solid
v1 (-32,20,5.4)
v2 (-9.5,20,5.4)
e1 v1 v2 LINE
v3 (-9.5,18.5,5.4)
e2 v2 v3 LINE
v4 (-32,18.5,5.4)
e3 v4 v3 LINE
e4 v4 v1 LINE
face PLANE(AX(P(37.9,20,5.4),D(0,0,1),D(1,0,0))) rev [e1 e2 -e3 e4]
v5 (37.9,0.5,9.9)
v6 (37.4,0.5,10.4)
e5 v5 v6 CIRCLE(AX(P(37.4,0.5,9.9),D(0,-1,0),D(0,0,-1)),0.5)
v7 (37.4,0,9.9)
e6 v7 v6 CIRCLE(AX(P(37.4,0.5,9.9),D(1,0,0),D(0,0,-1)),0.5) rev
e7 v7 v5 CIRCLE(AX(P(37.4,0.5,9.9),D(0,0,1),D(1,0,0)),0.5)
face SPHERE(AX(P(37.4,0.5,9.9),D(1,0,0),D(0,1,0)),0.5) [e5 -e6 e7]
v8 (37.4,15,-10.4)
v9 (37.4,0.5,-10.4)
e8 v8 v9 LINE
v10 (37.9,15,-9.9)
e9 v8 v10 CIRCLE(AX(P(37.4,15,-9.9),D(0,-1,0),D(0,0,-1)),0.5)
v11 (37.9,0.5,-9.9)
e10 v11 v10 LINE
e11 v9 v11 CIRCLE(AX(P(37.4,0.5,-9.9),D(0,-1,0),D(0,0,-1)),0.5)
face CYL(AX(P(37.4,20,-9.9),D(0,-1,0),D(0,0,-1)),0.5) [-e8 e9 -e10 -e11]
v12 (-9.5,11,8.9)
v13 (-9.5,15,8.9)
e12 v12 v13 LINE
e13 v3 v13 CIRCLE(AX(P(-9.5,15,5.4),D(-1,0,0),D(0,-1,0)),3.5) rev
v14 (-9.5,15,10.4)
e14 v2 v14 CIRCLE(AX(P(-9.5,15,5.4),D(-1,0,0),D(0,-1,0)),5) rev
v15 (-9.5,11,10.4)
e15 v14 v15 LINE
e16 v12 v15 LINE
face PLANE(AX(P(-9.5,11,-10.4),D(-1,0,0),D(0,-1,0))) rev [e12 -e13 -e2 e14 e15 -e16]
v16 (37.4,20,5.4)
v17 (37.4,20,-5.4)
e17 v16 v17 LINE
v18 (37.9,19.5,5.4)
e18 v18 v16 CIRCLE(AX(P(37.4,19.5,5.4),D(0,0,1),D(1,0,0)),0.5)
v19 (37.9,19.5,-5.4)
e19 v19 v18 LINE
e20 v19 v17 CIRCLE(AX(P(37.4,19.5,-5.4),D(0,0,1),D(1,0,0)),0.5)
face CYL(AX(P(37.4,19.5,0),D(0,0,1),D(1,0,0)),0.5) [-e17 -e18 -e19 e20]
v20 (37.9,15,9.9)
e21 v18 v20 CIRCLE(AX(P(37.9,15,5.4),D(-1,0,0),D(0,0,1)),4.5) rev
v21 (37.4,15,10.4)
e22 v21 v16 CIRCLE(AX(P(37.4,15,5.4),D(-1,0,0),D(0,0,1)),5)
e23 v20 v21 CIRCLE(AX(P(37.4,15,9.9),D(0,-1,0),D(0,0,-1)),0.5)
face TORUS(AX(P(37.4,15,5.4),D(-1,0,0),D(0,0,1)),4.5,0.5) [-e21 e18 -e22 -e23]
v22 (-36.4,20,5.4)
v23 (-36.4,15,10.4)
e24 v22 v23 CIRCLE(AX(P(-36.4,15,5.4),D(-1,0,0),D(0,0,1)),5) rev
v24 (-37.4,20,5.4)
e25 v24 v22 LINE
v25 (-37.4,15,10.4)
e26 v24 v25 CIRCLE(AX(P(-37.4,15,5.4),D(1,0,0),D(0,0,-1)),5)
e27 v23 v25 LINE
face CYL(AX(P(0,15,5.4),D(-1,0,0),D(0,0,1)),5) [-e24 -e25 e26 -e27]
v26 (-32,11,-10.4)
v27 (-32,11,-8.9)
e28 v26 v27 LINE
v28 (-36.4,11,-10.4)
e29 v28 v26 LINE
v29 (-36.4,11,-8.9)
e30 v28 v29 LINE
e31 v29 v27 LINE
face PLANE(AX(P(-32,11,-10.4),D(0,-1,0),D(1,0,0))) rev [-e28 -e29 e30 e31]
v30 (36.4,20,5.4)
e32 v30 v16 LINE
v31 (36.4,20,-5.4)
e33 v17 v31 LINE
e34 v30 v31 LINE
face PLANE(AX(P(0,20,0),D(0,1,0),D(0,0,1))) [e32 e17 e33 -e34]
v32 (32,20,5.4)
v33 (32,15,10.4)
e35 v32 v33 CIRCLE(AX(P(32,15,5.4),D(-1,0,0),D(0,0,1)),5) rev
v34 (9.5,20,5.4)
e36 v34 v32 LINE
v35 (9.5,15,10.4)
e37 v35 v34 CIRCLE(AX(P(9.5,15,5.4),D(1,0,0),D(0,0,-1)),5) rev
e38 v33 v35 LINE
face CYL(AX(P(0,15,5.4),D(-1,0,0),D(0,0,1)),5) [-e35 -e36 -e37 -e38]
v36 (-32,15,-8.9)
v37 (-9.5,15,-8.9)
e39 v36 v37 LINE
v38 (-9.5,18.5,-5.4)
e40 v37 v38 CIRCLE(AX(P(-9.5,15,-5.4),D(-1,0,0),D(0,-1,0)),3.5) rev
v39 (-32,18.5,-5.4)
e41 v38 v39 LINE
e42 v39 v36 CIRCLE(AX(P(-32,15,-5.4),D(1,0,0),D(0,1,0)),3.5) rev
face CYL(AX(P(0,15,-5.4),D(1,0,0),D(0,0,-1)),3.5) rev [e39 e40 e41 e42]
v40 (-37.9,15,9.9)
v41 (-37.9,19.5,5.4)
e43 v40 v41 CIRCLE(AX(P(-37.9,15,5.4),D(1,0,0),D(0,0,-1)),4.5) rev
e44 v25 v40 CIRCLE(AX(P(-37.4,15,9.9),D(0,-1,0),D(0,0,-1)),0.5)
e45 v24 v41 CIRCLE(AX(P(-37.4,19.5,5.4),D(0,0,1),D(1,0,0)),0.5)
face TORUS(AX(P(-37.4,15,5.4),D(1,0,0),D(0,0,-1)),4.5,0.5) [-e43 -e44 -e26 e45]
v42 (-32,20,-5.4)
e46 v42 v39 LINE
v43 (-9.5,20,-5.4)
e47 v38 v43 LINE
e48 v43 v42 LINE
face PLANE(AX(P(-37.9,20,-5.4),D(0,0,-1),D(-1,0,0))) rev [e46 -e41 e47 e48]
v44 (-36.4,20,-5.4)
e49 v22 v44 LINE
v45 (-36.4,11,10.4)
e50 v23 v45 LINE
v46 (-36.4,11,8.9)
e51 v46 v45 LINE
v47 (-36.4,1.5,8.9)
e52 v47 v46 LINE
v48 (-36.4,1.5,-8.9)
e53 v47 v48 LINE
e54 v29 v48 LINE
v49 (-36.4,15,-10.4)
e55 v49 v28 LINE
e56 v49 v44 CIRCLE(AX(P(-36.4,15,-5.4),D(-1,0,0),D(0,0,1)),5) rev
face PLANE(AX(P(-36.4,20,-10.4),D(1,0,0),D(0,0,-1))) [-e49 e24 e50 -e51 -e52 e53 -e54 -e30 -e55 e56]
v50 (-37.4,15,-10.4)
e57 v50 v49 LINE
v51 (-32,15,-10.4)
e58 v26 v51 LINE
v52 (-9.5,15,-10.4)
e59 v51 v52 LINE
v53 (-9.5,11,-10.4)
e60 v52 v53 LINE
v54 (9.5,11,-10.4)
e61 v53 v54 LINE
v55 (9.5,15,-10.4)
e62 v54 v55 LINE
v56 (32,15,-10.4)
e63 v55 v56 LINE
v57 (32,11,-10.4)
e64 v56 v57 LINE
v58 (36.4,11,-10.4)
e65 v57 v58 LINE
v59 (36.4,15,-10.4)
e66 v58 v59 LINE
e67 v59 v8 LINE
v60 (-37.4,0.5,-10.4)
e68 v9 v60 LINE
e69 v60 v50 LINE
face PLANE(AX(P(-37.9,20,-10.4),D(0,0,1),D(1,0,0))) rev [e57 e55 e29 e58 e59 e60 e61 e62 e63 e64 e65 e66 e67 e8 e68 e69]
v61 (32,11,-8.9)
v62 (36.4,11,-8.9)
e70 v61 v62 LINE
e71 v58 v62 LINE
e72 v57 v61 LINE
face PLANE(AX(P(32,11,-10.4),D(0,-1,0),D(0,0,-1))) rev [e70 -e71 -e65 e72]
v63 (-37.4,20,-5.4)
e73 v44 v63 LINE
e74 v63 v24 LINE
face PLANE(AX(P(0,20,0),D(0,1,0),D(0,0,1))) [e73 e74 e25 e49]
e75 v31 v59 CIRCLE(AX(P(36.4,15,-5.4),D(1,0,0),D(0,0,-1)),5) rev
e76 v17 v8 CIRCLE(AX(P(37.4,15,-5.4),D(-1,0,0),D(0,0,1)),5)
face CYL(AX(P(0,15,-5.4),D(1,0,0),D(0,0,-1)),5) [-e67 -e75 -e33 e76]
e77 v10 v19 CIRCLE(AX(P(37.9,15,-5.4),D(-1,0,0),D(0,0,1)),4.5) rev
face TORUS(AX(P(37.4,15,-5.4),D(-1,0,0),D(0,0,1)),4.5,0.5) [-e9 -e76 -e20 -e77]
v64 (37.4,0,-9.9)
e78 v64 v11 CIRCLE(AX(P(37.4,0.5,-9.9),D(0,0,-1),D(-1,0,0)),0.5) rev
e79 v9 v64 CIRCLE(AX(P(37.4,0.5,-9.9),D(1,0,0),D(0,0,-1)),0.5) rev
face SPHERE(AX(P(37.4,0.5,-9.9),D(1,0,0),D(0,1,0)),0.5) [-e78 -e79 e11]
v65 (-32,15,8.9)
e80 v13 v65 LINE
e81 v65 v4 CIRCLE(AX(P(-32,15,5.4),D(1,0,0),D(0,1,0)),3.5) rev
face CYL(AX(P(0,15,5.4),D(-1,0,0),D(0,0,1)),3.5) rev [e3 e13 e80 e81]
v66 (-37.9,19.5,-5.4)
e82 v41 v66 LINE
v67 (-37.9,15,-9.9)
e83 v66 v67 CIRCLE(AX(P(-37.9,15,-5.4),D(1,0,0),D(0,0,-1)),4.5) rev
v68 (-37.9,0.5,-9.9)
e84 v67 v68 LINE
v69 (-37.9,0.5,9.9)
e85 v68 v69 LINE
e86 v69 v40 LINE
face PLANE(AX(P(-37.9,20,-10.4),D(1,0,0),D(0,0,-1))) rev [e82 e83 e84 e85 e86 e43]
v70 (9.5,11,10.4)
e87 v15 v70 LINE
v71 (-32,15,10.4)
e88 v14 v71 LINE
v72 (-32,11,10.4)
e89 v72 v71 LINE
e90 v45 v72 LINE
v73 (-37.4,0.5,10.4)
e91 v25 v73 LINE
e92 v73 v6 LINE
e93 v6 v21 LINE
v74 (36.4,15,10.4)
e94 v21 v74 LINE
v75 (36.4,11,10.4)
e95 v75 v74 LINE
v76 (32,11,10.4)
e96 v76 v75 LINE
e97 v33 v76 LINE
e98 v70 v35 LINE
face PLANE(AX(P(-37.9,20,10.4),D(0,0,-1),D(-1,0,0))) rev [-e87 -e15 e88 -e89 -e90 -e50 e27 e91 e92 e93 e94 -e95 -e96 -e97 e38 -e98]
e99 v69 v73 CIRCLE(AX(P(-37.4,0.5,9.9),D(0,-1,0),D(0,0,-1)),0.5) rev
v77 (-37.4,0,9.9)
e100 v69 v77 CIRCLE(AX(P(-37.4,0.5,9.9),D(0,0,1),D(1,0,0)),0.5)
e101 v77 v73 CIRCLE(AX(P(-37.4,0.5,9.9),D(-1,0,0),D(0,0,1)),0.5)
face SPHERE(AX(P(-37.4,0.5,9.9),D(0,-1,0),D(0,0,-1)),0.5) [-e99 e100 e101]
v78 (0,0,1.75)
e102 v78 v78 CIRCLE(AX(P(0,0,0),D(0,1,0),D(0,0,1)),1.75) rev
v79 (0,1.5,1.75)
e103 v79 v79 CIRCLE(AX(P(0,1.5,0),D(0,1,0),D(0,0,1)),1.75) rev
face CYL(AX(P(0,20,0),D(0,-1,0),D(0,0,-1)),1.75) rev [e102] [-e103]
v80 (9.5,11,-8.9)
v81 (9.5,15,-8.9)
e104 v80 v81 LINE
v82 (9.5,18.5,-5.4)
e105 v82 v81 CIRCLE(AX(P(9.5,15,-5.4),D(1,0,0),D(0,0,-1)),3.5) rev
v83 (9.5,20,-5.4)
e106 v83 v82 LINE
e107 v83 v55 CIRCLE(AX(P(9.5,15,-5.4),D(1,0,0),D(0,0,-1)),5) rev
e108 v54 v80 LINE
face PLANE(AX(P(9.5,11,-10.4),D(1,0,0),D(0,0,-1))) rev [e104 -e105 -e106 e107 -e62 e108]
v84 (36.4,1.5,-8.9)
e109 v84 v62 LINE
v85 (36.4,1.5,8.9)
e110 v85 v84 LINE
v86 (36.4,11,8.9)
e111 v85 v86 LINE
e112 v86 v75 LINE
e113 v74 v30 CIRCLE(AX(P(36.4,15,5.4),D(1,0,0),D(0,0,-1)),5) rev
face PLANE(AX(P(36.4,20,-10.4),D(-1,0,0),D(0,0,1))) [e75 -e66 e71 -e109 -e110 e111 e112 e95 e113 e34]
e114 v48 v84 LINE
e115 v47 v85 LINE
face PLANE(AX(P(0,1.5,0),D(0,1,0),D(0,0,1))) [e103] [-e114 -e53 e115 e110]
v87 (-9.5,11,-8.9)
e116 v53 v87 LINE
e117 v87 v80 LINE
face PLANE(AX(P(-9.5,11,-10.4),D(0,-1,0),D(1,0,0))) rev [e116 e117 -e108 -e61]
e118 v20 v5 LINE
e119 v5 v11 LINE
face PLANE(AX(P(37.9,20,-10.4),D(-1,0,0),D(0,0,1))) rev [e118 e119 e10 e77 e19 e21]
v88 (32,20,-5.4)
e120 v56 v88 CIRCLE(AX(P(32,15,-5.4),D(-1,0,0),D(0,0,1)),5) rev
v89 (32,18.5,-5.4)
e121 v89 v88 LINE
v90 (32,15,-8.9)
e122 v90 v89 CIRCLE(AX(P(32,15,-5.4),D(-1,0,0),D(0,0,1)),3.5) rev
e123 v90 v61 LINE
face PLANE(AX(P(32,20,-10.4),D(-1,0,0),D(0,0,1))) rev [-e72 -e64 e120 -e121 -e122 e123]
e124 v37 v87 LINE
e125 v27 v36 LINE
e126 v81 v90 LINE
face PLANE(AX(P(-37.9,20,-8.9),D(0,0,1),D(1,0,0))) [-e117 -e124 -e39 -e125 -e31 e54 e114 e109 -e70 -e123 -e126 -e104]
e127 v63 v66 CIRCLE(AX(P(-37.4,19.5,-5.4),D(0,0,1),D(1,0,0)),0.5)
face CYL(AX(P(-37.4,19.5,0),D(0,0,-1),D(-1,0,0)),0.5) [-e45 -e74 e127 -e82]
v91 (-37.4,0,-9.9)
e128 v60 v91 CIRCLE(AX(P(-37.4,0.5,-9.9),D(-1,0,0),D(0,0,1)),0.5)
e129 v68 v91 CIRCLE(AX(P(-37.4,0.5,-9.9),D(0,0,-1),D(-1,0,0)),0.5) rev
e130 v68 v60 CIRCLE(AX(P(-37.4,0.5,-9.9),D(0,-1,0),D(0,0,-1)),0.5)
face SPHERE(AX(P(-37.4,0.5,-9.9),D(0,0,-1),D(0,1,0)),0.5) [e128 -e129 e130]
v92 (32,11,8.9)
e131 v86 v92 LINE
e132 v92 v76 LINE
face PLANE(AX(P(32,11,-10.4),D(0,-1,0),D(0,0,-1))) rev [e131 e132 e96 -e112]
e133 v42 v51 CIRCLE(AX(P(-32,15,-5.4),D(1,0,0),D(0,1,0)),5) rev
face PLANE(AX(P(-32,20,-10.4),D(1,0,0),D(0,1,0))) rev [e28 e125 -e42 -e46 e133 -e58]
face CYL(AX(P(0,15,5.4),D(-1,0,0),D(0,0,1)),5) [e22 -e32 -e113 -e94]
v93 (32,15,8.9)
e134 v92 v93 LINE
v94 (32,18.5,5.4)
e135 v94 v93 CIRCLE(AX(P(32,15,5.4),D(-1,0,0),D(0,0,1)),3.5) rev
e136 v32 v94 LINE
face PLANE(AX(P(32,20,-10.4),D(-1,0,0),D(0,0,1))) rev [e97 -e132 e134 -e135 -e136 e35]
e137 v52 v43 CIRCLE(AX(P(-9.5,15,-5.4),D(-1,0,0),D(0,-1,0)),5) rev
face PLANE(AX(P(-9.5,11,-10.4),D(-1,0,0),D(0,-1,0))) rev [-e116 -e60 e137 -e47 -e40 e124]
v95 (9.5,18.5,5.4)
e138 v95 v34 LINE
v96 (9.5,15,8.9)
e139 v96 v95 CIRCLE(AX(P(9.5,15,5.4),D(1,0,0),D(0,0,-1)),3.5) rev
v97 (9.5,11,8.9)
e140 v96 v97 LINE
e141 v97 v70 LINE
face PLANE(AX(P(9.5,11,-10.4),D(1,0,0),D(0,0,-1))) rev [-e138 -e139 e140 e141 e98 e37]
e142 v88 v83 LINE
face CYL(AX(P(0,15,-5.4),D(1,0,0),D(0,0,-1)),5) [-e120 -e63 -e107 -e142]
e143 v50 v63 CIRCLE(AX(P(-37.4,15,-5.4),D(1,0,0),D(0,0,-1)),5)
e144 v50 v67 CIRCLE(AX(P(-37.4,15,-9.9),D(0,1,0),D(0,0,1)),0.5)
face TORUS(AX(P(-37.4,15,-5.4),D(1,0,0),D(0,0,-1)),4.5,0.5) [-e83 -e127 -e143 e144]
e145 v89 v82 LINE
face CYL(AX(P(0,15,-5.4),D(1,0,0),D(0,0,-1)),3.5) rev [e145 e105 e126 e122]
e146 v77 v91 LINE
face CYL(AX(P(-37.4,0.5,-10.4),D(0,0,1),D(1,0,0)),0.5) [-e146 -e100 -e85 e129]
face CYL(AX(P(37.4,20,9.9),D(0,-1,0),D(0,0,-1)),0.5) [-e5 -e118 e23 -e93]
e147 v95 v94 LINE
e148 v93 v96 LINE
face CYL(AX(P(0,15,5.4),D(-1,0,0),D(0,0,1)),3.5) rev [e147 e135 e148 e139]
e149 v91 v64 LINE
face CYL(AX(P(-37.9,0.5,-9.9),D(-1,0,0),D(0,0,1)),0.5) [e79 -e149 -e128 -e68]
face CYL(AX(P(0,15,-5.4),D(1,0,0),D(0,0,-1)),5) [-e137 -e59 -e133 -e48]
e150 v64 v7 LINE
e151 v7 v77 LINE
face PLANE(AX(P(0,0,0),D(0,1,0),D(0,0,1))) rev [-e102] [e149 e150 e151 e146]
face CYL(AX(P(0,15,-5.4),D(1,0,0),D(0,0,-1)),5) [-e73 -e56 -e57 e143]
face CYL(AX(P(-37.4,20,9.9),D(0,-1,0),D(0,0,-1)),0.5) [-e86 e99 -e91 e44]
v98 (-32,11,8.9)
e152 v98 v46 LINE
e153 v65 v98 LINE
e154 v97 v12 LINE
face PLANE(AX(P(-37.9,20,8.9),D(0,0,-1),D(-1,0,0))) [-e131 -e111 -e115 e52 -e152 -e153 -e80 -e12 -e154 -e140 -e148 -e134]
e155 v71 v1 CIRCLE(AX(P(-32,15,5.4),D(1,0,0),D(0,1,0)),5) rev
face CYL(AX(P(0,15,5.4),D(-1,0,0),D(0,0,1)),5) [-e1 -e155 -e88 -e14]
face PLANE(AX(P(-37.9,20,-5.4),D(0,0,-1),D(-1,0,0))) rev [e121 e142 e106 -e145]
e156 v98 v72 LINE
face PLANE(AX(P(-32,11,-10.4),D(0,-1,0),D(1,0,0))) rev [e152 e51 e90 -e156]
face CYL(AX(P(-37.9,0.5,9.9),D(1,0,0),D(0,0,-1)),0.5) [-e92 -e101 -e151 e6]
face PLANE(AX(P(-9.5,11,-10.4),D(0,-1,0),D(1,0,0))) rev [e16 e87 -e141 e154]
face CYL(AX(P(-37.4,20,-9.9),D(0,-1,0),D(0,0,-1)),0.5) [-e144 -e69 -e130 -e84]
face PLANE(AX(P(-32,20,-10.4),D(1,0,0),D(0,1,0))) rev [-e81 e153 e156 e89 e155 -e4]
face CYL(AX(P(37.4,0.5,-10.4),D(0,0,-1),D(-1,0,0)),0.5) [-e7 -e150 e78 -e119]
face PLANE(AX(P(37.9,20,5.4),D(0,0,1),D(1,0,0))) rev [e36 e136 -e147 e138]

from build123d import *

# Parameters (mm, degrees)
CROQUIS1_W                        = 75.8
CROQUIS1_H                        = 20.8
SALIENTE_EXTRUIR1_DEPTH           = 20
REDONDEO1_R                       = 5
REDONDEO2_R                       = 0.5
VACIADO1_START                    = -36.4
VACIADO1_DEPTH                    = 72.8
CORTAR_EXTRUIR1_DEPTH             = 45.097278828
CORTAR_EXTRUIR1_DEPTH_BACK        = 45.097278828
CORTAR_EXTRUIR2_REACH             = 45.438
CROQUIS3_R                        = 1.75
CORTAR_EXTRUIR2_DIRECTION_2_DEPTH = 44.437541367


# Read off the part's stored shape, not the designer's step: Vaciado1
with BuildPart() as part:
    # Croquis1 → Saliente-Extruir1 (new body)
    with BuildSketch(Plane(origin=(0, 0, 0), x_dir=(1, 0, 0), z_dir=(0, 1, 0))):
        Rectangle(CROQUIS1_W, CROQUIS1_H)
    extrude(amount=SALIENTE_EXTRUIR1_DEPTH)

    # Redondeo1
    redondeo1_edges = [part.edges().sort_by_distance(p)[0] for p in [
        (0, 20, 10.4),
        (0, 20, -10.4),
    ]]
    fillet(redondeo1_edges, radius=REDONDEO1_R)

    # Redondeo2
    redondeo2_edges = [part.edges().sort_by_distance(p)[0] for p in [
        (37.9, 20, 0),
        (-37.9, 20, 0),
        (-37.9, 7.5, 10.4),
        (-37.9, 7.5, -10.4),
        (-37.9, 18.535533906, 8.935533906),
        (-37.9, 18.535533906, -8.935533906),
        (37.9, 7.5, -10.4),
        (37.9, 7.5, 10.4),
        (37.9, 18.535533906, 8.935533906),
        (37.9, 18.535533906, -8.935533906),
        (0, 0, 10.4),
        (-37.9, 0, 0),
        (0, 0, -10.4),
        (37.9, 0, 0),
    ]]
    fillet(redondeo2_edges, radius=REDONDEO2_R)

    # Vaciado1 outline → Vaciado1 (cut)
    with BuildSketch(Plane.YZ.offset(VACIADO1_START)):
        with BuildLine():
            Line((20, -5.4), (20, 5.4))
            Line((20, 5.4), (18.5, 5.4))
            ThreePointArc((18.5, 5.4), (17.474873734, 7.874873734), (15, 8.9))
            Line((15, 8.9), (1.5, 8.9))
            Line((1.5, 8.9), (1.5, -8.9))
            Line((1.5, -8.9), (15, -8.9))
            ThreePointArc((15, -8.9), (17.474873734, -7.874873734), (18.5, -5.4))
            Line((18.5, -5.4), (20, -5.4))
        make_face()
    extrude(amount=VACIADO1_DEPTH, mode=Mode.SUBTRACT)

    # Croquis2 → Cortar-Extruir1 (cut, two sides: drawn at the far end of the back side and taken through both)
    with BuildSketch(Plane.XY.offset(-CORTAR_EXTRUIR1_DEPTH_BACK)):
        Polygon((-9.5, 11), (9.5, 11), (9.5, 20), (32, 20), (32, 11), (36.4, 11), (36.4, 23), (-36.4, 23), (-36.4, 11), (-32, 11), (-32, 20), (-9.5, 20), align=None)
    extrude(amount=CORTAR_EXTRUIR1_DEPTH + CORTAR_EXTRUIR1_DEPTH_BACK, mode=Mode.SUBTRACT)

    # Croquis3 → Cortar-Extruir2 (cut, up to next)
    with BuildSketch(Plane(origin=(0, 1.5, 0), x_dir=(1, 0, 0), z_dir=(0, 1, 0)), mode=Mode.PRIVATE) as cortar_extruir2_sk1:
        with Locations(Location((0, 0, 0), (0, 0, 270))):
            Circle(CROQUIS3_R)
    cortar_extruir2_tool1 = extrude(cortar_extruir2_sk1.sketch, amount=-CORTAR_EXTRUIR2_REACH, mode=Mode.PRIVATE) & part.part
    add(cortar_extruir2_tool1.solids().sort_by_distance((0, 1.5, 0))[0], mode=Mode.SUBTRACT)

    # Croquis3 → Cortar-Extruir2 direction 2 (cut)
    with BuildSketch(Plane(origin=(0, 1.5, 0), x_dir=(1, 0, 0), z_dir=(0, 1, 0))):
        with Locations(Location((0, 0, 0), (0, 0, 270))):
            Circle(CROQUIS3_R)
    extrude(amount=CORTAR_EXTRUIR2_DIRECTION_2_DEPTH, mode=Mode.SUBTRACT)


solid = part.part
